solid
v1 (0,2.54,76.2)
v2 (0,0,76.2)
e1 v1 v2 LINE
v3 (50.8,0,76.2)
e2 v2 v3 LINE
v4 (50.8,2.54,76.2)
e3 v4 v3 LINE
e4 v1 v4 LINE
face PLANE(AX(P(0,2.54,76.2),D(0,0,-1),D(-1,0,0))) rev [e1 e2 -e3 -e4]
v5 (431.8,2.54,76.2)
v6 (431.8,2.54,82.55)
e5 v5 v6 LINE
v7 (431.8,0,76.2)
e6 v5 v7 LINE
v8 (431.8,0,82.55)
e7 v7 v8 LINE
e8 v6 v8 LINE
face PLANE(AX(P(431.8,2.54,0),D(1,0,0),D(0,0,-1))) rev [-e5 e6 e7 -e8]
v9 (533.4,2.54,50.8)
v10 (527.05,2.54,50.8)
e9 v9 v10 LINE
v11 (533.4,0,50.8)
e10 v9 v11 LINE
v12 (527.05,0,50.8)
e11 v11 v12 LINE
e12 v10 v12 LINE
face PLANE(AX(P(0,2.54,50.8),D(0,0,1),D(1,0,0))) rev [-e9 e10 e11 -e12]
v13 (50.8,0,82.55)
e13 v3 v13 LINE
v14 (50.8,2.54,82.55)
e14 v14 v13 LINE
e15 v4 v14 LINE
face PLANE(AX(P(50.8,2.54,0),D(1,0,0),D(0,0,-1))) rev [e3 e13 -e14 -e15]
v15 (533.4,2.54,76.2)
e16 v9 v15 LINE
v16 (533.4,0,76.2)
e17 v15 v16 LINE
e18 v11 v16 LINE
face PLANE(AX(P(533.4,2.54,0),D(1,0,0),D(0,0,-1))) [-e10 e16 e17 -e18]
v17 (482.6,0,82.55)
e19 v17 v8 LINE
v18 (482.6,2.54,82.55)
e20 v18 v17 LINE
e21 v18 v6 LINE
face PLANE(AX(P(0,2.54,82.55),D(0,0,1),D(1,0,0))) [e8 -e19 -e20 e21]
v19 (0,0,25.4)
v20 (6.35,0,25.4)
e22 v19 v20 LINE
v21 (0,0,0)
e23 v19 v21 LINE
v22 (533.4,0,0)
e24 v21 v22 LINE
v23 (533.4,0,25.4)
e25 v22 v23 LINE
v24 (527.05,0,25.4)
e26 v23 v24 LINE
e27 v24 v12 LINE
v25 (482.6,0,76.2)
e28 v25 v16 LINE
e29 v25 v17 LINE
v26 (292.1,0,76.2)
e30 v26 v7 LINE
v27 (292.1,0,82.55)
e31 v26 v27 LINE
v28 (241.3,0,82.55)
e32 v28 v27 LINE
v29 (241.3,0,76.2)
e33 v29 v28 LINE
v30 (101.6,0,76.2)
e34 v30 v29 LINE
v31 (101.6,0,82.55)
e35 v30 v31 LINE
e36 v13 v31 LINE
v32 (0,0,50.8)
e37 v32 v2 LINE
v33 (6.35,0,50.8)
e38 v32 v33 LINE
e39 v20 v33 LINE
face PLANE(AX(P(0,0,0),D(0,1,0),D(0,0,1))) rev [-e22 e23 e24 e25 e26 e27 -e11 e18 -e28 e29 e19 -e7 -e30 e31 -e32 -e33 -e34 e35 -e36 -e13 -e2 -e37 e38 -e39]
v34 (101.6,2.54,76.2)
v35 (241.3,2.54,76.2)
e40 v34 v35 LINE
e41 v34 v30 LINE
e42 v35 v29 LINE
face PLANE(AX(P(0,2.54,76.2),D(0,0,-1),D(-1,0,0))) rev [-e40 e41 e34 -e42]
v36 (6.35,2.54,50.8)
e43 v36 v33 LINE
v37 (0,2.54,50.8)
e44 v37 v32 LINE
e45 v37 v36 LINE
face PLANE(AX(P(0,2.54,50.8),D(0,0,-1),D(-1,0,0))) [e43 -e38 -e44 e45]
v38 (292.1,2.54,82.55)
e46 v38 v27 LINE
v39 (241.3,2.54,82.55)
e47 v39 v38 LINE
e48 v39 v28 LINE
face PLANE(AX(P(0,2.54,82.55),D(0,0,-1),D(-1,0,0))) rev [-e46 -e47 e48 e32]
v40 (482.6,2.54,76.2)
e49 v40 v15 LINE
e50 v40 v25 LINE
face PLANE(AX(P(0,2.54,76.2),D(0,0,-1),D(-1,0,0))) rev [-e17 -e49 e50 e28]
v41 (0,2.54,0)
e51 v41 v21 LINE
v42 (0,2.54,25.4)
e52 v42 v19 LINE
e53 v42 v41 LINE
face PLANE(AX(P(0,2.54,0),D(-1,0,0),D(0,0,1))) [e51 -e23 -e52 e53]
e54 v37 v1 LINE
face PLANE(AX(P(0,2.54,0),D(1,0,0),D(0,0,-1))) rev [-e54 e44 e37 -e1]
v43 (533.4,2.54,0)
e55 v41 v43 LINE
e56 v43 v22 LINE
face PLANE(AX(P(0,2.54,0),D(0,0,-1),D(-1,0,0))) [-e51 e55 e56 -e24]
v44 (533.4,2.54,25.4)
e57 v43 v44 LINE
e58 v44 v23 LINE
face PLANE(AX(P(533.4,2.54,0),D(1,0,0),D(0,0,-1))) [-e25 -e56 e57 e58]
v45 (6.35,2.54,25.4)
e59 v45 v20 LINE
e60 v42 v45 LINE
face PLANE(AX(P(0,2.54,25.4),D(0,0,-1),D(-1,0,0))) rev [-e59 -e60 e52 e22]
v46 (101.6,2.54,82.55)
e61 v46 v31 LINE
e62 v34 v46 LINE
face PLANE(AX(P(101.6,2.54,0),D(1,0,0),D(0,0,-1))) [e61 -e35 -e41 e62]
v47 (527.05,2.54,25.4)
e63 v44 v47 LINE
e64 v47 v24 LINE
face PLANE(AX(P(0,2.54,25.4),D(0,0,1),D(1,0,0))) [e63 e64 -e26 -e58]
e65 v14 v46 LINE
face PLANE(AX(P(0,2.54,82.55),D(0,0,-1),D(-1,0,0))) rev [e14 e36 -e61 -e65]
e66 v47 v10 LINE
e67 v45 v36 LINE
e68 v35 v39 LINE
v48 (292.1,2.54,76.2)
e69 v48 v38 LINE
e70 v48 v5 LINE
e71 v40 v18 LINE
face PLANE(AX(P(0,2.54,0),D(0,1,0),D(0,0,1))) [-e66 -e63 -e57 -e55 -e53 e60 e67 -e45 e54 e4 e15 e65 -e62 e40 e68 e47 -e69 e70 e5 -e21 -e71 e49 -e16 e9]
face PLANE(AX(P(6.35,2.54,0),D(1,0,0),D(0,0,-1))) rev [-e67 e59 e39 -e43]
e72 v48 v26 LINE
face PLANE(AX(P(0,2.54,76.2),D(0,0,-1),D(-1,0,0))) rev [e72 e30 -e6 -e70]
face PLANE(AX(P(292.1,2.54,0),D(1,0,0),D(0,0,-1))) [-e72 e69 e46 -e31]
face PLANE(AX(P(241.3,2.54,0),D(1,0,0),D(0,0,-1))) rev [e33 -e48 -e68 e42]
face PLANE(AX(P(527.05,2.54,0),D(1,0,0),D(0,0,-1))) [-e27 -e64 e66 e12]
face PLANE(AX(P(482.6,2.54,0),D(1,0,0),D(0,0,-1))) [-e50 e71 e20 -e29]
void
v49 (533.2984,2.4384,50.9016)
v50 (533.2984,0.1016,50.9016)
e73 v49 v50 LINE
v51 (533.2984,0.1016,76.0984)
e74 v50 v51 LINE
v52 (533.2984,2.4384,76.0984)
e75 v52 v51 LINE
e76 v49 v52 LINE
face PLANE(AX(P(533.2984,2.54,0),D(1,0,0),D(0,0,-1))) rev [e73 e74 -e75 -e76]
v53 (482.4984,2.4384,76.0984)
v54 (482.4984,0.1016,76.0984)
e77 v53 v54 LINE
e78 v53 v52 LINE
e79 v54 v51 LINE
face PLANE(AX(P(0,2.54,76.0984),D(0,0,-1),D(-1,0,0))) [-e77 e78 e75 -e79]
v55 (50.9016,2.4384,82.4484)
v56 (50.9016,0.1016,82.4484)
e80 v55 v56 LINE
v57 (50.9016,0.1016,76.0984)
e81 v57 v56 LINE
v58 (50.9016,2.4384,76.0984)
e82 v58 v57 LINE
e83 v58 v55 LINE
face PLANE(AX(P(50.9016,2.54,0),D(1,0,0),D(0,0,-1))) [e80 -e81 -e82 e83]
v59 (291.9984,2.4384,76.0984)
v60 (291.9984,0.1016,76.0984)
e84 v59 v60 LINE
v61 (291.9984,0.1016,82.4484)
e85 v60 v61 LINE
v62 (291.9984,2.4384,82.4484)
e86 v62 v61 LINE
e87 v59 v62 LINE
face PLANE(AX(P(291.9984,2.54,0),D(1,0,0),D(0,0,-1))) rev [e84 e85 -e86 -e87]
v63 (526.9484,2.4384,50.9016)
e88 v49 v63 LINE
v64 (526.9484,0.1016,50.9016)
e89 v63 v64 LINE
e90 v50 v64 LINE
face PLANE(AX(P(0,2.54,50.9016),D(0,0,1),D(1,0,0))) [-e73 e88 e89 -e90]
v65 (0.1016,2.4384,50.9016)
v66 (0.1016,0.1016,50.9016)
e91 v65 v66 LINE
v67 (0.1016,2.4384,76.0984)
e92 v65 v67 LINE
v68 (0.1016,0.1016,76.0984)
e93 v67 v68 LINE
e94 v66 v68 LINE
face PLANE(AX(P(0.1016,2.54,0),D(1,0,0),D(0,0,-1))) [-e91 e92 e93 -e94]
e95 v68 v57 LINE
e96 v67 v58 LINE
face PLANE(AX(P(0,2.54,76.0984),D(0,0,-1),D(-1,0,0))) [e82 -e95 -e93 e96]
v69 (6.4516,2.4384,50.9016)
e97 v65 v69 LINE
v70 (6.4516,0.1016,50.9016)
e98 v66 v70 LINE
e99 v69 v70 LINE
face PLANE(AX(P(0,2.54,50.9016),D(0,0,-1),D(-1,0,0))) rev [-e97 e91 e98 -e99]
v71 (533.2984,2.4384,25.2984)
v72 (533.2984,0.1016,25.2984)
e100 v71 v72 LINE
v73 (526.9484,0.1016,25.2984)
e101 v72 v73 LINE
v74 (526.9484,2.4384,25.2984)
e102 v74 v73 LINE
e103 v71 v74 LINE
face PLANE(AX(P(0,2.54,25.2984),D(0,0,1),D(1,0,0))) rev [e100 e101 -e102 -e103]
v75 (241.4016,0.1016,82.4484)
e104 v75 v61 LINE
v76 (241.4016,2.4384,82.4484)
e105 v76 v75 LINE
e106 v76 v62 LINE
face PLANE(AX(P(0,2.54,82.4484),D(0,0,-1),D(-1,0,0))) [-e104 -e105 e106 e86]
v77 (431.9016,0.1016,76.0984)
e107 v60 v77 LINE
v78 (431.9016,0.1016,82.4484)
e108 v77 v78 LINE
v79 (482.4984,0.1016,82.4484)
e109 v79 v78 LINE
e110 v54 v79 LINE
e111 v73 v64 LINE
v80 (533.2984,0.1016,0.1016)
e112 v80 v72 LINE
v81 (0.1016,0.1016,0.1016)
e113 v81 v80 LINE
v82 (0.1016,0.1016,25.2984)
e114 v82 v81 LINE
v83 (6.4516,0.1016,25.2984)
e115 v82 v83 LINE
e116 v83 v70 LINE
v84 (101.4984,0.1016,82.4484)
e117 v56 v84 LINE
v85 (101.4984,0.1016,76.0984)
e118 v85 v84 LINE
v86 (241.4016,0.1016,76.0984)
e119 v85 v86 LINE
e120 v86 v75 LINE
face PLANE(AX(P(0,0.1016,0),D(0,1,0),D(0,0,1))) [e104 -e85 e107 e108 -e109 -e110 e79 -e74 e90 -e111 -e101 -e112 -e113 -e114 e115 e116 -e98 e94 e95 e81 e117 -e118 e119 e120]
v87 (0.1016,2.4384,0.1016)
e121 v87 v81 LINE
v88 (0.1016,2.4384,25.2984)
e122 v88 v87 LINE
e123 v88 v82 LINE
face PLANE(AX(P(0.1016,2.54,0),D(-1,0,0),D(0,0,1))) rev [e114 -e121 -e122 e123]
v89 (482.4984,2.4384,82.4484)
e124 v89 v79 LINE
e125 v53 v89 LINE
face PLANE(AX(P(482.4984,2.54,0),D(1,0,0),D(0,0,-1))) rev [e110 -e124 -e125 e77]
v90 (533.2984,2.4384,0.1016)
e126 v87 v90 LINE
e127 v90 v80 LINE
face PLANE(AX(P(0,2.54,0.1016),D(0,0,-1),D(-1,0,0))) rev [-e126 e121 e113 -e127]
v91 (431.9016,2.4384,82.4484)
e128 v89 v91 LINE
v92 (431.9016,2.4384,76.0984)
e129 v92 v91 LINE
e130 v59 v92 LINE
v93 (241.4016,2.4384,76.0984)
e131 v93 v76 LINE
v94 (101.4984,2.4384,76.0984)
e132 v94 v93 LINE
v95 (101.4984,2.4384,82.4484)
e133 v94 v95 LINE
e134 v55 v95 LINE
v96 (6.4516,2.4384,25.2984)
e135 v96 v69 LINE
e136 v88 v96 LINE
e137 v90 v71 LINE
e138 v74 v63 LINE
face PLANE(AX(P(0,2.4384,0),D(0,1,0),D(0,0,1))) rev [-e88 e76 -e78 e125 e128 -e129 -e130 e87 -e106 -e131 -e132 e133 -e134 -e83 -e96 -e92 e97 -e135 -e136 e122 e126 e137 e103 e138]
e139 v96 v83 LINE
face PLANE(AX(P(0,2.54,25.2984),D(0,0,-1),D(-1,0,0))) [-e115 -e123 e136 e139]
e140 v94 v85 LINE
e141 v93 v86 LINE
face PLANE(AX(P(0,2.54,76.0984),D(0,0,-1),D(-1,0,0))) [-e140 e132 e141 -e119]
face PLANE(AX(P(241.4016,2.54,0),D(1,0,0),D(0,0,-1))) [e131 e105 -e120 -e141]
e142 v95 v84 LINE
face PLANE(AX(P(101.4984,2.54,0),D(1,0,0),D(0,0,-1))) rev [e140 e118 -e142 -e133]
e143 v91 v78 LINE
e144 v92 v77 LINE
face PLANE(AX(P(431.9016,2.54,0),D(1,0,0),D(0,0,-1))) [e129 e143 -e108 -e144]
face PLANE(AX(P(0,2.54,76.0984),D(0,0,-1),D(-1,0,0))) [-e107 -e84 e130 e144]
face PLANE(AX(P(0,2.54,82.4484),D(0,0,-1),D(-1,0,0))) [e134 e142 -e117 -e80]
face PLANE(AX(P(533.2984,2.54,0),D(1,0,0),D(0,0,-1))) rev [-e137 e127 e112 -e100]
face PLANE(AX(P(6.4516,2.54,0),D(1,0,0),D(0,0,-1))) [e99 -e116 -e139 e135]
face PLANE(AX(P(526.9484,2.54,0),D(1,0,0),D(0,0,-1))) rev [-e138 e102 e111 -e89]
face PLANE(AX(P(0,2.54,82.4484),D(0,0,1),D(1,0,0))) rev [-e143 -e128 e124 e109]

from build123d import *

# Parameters (mm, degrees)
BOSS_EXTRUDE1_DEPTH = 2.54
SHELL1_START        = 6.4516
SHELL1_OUTLINE_W    = 2.3368
SHELL1_OUTLINE_H    = 75.9968
SHELL1_DEPTH        = 520.4968
SHELL1_START_2      = 0.1016
SHELL1_2_OUTLINE_W  = 2.3368
SHELL1_2_OUTLINE_H  = 25.1968
SHELL1_2_DEPTH      = 533.1968
SHELL1_START_3      = 50.9016
SHELL1_3_OUTLINE_W  = 2.3368
SHELL1_3_OUTLINE_H  = 6.35
SHELL1_3_DEPTH      = 50.5968
SHELL1_START_4      = 241.4016
SHELL1_4_OUTLINE_W  = 2.3368
SHELL1_4_OUTLINE_H  = 6.35
SHELL1_4_DEPTH      = 50.5968
SHELL1_START_5      = 431.9016
SHELL1_5_OUTLINE_W  = 2.3368
SHELL1_5_OUTLINE_H  = 6.35
SHELL1_5_DEPTH      = 50.5968


# Read off the part's stored shape, not the designer's step: Shell1
with BuildPart() as part:
    # Sketch1 → Boss-Extrude1 (new body)
    with BuildSketch(Plane(origin=(0, 0, 0), x_dir=(1, 0, 0), z_dir=(0, 1, 0))):
        Polygon((292.1, -76.2), (292.1, -82.55), (241.3, -82.55), (241.3, -76.2), (101.6, -76.2), (101.6, -82.55), (50.8, -82.55), (50.8, -76.2), (0, -76.2), (0, -50.8), (6.35, -50.8), (6.35, -25.4), (0, -25.4), (0, 0), (533.4, 0), (533.4, -25.4), (527.05, -25.4), (527.05, -50.8), (533.4, -50.8), (533.4, -76.2), (482.6, -76.2), (482.6, -82.55), (431.8, -82.55), (431.8, -76.2), align=None)
    extrude(amount=BOSS_EXTRUDE1_DEPTH)

    # Shell1 outline → Shell1 (cut)
    with BuildSketch(Plane.YZ.offset(SHELL1_START)):
        with Locations((1.27, 38.1)):
            Rectangle(SHELL1_OUTLINE_W, SHELL1_OUTLINE_H)
    extrude(amount=SHELL1_DEPTH, mode=Mode.SUBTRACT)

    # Shell1 2 outline → Shell1 2 (cut)
    with BuildSketch(Plane.YZ.offset(SHELL1_START_2)):
        with Locations((1.27, 63.5)):
            Rectangle(SHELL1_2_OUTLINE_W, SHELL1_2_OUTLINE_H)
        with Locations((1.27, 12.7)):
            Rectangle(SHELL1_2_OUTLINE_W, SHELL1_2_OUTLINE_H)
    extrude(amount=SHELL1_2_DEPTH, mode=Mode.SUBTRACT)

    # Shell1 3 outline → Shell1 3 (cut)
    with BuildSketch(Plane.YZ.offset(SHELL1_START_3)):
        with Locations((1.27, 79.2734)):
            Rectangle(SHELL1_3_OUTLINE_W, SHELL1_3_OUTLINE_H)
    extrude(amount=SHELL1_3_DEPTH, mode=Mode.SUBTRACT)

    # Shell1 4 outline → Shell1 4 (cut)
    with BuildSketch(Plane.YZ.offset(SHELL1_START_4)):
        with Locations((1.27, 79.2734)):
            Rectangle(SHELL1_4_OUTLINE_W, SHELL1_4_OUTLINE_H)
    extrude(amount=SHELL1_4_DEPTH, mode=Mode.SUBTRACT)

    # Shell1 5 outline → Shell1 5 (cut)
    with BuildSketch(Plane.YZ.offset(SHELL1_START_5)):
        with Locations((1.27, 79.2734)):
            Rectangle(SHELL1_5_OUTLINE_W, SHELL1_5_OUTLINE_H)
    extrude(amount=SHELL1_5_DEPTH, mode=Mode.SUBTRACT)


solid = part.part
